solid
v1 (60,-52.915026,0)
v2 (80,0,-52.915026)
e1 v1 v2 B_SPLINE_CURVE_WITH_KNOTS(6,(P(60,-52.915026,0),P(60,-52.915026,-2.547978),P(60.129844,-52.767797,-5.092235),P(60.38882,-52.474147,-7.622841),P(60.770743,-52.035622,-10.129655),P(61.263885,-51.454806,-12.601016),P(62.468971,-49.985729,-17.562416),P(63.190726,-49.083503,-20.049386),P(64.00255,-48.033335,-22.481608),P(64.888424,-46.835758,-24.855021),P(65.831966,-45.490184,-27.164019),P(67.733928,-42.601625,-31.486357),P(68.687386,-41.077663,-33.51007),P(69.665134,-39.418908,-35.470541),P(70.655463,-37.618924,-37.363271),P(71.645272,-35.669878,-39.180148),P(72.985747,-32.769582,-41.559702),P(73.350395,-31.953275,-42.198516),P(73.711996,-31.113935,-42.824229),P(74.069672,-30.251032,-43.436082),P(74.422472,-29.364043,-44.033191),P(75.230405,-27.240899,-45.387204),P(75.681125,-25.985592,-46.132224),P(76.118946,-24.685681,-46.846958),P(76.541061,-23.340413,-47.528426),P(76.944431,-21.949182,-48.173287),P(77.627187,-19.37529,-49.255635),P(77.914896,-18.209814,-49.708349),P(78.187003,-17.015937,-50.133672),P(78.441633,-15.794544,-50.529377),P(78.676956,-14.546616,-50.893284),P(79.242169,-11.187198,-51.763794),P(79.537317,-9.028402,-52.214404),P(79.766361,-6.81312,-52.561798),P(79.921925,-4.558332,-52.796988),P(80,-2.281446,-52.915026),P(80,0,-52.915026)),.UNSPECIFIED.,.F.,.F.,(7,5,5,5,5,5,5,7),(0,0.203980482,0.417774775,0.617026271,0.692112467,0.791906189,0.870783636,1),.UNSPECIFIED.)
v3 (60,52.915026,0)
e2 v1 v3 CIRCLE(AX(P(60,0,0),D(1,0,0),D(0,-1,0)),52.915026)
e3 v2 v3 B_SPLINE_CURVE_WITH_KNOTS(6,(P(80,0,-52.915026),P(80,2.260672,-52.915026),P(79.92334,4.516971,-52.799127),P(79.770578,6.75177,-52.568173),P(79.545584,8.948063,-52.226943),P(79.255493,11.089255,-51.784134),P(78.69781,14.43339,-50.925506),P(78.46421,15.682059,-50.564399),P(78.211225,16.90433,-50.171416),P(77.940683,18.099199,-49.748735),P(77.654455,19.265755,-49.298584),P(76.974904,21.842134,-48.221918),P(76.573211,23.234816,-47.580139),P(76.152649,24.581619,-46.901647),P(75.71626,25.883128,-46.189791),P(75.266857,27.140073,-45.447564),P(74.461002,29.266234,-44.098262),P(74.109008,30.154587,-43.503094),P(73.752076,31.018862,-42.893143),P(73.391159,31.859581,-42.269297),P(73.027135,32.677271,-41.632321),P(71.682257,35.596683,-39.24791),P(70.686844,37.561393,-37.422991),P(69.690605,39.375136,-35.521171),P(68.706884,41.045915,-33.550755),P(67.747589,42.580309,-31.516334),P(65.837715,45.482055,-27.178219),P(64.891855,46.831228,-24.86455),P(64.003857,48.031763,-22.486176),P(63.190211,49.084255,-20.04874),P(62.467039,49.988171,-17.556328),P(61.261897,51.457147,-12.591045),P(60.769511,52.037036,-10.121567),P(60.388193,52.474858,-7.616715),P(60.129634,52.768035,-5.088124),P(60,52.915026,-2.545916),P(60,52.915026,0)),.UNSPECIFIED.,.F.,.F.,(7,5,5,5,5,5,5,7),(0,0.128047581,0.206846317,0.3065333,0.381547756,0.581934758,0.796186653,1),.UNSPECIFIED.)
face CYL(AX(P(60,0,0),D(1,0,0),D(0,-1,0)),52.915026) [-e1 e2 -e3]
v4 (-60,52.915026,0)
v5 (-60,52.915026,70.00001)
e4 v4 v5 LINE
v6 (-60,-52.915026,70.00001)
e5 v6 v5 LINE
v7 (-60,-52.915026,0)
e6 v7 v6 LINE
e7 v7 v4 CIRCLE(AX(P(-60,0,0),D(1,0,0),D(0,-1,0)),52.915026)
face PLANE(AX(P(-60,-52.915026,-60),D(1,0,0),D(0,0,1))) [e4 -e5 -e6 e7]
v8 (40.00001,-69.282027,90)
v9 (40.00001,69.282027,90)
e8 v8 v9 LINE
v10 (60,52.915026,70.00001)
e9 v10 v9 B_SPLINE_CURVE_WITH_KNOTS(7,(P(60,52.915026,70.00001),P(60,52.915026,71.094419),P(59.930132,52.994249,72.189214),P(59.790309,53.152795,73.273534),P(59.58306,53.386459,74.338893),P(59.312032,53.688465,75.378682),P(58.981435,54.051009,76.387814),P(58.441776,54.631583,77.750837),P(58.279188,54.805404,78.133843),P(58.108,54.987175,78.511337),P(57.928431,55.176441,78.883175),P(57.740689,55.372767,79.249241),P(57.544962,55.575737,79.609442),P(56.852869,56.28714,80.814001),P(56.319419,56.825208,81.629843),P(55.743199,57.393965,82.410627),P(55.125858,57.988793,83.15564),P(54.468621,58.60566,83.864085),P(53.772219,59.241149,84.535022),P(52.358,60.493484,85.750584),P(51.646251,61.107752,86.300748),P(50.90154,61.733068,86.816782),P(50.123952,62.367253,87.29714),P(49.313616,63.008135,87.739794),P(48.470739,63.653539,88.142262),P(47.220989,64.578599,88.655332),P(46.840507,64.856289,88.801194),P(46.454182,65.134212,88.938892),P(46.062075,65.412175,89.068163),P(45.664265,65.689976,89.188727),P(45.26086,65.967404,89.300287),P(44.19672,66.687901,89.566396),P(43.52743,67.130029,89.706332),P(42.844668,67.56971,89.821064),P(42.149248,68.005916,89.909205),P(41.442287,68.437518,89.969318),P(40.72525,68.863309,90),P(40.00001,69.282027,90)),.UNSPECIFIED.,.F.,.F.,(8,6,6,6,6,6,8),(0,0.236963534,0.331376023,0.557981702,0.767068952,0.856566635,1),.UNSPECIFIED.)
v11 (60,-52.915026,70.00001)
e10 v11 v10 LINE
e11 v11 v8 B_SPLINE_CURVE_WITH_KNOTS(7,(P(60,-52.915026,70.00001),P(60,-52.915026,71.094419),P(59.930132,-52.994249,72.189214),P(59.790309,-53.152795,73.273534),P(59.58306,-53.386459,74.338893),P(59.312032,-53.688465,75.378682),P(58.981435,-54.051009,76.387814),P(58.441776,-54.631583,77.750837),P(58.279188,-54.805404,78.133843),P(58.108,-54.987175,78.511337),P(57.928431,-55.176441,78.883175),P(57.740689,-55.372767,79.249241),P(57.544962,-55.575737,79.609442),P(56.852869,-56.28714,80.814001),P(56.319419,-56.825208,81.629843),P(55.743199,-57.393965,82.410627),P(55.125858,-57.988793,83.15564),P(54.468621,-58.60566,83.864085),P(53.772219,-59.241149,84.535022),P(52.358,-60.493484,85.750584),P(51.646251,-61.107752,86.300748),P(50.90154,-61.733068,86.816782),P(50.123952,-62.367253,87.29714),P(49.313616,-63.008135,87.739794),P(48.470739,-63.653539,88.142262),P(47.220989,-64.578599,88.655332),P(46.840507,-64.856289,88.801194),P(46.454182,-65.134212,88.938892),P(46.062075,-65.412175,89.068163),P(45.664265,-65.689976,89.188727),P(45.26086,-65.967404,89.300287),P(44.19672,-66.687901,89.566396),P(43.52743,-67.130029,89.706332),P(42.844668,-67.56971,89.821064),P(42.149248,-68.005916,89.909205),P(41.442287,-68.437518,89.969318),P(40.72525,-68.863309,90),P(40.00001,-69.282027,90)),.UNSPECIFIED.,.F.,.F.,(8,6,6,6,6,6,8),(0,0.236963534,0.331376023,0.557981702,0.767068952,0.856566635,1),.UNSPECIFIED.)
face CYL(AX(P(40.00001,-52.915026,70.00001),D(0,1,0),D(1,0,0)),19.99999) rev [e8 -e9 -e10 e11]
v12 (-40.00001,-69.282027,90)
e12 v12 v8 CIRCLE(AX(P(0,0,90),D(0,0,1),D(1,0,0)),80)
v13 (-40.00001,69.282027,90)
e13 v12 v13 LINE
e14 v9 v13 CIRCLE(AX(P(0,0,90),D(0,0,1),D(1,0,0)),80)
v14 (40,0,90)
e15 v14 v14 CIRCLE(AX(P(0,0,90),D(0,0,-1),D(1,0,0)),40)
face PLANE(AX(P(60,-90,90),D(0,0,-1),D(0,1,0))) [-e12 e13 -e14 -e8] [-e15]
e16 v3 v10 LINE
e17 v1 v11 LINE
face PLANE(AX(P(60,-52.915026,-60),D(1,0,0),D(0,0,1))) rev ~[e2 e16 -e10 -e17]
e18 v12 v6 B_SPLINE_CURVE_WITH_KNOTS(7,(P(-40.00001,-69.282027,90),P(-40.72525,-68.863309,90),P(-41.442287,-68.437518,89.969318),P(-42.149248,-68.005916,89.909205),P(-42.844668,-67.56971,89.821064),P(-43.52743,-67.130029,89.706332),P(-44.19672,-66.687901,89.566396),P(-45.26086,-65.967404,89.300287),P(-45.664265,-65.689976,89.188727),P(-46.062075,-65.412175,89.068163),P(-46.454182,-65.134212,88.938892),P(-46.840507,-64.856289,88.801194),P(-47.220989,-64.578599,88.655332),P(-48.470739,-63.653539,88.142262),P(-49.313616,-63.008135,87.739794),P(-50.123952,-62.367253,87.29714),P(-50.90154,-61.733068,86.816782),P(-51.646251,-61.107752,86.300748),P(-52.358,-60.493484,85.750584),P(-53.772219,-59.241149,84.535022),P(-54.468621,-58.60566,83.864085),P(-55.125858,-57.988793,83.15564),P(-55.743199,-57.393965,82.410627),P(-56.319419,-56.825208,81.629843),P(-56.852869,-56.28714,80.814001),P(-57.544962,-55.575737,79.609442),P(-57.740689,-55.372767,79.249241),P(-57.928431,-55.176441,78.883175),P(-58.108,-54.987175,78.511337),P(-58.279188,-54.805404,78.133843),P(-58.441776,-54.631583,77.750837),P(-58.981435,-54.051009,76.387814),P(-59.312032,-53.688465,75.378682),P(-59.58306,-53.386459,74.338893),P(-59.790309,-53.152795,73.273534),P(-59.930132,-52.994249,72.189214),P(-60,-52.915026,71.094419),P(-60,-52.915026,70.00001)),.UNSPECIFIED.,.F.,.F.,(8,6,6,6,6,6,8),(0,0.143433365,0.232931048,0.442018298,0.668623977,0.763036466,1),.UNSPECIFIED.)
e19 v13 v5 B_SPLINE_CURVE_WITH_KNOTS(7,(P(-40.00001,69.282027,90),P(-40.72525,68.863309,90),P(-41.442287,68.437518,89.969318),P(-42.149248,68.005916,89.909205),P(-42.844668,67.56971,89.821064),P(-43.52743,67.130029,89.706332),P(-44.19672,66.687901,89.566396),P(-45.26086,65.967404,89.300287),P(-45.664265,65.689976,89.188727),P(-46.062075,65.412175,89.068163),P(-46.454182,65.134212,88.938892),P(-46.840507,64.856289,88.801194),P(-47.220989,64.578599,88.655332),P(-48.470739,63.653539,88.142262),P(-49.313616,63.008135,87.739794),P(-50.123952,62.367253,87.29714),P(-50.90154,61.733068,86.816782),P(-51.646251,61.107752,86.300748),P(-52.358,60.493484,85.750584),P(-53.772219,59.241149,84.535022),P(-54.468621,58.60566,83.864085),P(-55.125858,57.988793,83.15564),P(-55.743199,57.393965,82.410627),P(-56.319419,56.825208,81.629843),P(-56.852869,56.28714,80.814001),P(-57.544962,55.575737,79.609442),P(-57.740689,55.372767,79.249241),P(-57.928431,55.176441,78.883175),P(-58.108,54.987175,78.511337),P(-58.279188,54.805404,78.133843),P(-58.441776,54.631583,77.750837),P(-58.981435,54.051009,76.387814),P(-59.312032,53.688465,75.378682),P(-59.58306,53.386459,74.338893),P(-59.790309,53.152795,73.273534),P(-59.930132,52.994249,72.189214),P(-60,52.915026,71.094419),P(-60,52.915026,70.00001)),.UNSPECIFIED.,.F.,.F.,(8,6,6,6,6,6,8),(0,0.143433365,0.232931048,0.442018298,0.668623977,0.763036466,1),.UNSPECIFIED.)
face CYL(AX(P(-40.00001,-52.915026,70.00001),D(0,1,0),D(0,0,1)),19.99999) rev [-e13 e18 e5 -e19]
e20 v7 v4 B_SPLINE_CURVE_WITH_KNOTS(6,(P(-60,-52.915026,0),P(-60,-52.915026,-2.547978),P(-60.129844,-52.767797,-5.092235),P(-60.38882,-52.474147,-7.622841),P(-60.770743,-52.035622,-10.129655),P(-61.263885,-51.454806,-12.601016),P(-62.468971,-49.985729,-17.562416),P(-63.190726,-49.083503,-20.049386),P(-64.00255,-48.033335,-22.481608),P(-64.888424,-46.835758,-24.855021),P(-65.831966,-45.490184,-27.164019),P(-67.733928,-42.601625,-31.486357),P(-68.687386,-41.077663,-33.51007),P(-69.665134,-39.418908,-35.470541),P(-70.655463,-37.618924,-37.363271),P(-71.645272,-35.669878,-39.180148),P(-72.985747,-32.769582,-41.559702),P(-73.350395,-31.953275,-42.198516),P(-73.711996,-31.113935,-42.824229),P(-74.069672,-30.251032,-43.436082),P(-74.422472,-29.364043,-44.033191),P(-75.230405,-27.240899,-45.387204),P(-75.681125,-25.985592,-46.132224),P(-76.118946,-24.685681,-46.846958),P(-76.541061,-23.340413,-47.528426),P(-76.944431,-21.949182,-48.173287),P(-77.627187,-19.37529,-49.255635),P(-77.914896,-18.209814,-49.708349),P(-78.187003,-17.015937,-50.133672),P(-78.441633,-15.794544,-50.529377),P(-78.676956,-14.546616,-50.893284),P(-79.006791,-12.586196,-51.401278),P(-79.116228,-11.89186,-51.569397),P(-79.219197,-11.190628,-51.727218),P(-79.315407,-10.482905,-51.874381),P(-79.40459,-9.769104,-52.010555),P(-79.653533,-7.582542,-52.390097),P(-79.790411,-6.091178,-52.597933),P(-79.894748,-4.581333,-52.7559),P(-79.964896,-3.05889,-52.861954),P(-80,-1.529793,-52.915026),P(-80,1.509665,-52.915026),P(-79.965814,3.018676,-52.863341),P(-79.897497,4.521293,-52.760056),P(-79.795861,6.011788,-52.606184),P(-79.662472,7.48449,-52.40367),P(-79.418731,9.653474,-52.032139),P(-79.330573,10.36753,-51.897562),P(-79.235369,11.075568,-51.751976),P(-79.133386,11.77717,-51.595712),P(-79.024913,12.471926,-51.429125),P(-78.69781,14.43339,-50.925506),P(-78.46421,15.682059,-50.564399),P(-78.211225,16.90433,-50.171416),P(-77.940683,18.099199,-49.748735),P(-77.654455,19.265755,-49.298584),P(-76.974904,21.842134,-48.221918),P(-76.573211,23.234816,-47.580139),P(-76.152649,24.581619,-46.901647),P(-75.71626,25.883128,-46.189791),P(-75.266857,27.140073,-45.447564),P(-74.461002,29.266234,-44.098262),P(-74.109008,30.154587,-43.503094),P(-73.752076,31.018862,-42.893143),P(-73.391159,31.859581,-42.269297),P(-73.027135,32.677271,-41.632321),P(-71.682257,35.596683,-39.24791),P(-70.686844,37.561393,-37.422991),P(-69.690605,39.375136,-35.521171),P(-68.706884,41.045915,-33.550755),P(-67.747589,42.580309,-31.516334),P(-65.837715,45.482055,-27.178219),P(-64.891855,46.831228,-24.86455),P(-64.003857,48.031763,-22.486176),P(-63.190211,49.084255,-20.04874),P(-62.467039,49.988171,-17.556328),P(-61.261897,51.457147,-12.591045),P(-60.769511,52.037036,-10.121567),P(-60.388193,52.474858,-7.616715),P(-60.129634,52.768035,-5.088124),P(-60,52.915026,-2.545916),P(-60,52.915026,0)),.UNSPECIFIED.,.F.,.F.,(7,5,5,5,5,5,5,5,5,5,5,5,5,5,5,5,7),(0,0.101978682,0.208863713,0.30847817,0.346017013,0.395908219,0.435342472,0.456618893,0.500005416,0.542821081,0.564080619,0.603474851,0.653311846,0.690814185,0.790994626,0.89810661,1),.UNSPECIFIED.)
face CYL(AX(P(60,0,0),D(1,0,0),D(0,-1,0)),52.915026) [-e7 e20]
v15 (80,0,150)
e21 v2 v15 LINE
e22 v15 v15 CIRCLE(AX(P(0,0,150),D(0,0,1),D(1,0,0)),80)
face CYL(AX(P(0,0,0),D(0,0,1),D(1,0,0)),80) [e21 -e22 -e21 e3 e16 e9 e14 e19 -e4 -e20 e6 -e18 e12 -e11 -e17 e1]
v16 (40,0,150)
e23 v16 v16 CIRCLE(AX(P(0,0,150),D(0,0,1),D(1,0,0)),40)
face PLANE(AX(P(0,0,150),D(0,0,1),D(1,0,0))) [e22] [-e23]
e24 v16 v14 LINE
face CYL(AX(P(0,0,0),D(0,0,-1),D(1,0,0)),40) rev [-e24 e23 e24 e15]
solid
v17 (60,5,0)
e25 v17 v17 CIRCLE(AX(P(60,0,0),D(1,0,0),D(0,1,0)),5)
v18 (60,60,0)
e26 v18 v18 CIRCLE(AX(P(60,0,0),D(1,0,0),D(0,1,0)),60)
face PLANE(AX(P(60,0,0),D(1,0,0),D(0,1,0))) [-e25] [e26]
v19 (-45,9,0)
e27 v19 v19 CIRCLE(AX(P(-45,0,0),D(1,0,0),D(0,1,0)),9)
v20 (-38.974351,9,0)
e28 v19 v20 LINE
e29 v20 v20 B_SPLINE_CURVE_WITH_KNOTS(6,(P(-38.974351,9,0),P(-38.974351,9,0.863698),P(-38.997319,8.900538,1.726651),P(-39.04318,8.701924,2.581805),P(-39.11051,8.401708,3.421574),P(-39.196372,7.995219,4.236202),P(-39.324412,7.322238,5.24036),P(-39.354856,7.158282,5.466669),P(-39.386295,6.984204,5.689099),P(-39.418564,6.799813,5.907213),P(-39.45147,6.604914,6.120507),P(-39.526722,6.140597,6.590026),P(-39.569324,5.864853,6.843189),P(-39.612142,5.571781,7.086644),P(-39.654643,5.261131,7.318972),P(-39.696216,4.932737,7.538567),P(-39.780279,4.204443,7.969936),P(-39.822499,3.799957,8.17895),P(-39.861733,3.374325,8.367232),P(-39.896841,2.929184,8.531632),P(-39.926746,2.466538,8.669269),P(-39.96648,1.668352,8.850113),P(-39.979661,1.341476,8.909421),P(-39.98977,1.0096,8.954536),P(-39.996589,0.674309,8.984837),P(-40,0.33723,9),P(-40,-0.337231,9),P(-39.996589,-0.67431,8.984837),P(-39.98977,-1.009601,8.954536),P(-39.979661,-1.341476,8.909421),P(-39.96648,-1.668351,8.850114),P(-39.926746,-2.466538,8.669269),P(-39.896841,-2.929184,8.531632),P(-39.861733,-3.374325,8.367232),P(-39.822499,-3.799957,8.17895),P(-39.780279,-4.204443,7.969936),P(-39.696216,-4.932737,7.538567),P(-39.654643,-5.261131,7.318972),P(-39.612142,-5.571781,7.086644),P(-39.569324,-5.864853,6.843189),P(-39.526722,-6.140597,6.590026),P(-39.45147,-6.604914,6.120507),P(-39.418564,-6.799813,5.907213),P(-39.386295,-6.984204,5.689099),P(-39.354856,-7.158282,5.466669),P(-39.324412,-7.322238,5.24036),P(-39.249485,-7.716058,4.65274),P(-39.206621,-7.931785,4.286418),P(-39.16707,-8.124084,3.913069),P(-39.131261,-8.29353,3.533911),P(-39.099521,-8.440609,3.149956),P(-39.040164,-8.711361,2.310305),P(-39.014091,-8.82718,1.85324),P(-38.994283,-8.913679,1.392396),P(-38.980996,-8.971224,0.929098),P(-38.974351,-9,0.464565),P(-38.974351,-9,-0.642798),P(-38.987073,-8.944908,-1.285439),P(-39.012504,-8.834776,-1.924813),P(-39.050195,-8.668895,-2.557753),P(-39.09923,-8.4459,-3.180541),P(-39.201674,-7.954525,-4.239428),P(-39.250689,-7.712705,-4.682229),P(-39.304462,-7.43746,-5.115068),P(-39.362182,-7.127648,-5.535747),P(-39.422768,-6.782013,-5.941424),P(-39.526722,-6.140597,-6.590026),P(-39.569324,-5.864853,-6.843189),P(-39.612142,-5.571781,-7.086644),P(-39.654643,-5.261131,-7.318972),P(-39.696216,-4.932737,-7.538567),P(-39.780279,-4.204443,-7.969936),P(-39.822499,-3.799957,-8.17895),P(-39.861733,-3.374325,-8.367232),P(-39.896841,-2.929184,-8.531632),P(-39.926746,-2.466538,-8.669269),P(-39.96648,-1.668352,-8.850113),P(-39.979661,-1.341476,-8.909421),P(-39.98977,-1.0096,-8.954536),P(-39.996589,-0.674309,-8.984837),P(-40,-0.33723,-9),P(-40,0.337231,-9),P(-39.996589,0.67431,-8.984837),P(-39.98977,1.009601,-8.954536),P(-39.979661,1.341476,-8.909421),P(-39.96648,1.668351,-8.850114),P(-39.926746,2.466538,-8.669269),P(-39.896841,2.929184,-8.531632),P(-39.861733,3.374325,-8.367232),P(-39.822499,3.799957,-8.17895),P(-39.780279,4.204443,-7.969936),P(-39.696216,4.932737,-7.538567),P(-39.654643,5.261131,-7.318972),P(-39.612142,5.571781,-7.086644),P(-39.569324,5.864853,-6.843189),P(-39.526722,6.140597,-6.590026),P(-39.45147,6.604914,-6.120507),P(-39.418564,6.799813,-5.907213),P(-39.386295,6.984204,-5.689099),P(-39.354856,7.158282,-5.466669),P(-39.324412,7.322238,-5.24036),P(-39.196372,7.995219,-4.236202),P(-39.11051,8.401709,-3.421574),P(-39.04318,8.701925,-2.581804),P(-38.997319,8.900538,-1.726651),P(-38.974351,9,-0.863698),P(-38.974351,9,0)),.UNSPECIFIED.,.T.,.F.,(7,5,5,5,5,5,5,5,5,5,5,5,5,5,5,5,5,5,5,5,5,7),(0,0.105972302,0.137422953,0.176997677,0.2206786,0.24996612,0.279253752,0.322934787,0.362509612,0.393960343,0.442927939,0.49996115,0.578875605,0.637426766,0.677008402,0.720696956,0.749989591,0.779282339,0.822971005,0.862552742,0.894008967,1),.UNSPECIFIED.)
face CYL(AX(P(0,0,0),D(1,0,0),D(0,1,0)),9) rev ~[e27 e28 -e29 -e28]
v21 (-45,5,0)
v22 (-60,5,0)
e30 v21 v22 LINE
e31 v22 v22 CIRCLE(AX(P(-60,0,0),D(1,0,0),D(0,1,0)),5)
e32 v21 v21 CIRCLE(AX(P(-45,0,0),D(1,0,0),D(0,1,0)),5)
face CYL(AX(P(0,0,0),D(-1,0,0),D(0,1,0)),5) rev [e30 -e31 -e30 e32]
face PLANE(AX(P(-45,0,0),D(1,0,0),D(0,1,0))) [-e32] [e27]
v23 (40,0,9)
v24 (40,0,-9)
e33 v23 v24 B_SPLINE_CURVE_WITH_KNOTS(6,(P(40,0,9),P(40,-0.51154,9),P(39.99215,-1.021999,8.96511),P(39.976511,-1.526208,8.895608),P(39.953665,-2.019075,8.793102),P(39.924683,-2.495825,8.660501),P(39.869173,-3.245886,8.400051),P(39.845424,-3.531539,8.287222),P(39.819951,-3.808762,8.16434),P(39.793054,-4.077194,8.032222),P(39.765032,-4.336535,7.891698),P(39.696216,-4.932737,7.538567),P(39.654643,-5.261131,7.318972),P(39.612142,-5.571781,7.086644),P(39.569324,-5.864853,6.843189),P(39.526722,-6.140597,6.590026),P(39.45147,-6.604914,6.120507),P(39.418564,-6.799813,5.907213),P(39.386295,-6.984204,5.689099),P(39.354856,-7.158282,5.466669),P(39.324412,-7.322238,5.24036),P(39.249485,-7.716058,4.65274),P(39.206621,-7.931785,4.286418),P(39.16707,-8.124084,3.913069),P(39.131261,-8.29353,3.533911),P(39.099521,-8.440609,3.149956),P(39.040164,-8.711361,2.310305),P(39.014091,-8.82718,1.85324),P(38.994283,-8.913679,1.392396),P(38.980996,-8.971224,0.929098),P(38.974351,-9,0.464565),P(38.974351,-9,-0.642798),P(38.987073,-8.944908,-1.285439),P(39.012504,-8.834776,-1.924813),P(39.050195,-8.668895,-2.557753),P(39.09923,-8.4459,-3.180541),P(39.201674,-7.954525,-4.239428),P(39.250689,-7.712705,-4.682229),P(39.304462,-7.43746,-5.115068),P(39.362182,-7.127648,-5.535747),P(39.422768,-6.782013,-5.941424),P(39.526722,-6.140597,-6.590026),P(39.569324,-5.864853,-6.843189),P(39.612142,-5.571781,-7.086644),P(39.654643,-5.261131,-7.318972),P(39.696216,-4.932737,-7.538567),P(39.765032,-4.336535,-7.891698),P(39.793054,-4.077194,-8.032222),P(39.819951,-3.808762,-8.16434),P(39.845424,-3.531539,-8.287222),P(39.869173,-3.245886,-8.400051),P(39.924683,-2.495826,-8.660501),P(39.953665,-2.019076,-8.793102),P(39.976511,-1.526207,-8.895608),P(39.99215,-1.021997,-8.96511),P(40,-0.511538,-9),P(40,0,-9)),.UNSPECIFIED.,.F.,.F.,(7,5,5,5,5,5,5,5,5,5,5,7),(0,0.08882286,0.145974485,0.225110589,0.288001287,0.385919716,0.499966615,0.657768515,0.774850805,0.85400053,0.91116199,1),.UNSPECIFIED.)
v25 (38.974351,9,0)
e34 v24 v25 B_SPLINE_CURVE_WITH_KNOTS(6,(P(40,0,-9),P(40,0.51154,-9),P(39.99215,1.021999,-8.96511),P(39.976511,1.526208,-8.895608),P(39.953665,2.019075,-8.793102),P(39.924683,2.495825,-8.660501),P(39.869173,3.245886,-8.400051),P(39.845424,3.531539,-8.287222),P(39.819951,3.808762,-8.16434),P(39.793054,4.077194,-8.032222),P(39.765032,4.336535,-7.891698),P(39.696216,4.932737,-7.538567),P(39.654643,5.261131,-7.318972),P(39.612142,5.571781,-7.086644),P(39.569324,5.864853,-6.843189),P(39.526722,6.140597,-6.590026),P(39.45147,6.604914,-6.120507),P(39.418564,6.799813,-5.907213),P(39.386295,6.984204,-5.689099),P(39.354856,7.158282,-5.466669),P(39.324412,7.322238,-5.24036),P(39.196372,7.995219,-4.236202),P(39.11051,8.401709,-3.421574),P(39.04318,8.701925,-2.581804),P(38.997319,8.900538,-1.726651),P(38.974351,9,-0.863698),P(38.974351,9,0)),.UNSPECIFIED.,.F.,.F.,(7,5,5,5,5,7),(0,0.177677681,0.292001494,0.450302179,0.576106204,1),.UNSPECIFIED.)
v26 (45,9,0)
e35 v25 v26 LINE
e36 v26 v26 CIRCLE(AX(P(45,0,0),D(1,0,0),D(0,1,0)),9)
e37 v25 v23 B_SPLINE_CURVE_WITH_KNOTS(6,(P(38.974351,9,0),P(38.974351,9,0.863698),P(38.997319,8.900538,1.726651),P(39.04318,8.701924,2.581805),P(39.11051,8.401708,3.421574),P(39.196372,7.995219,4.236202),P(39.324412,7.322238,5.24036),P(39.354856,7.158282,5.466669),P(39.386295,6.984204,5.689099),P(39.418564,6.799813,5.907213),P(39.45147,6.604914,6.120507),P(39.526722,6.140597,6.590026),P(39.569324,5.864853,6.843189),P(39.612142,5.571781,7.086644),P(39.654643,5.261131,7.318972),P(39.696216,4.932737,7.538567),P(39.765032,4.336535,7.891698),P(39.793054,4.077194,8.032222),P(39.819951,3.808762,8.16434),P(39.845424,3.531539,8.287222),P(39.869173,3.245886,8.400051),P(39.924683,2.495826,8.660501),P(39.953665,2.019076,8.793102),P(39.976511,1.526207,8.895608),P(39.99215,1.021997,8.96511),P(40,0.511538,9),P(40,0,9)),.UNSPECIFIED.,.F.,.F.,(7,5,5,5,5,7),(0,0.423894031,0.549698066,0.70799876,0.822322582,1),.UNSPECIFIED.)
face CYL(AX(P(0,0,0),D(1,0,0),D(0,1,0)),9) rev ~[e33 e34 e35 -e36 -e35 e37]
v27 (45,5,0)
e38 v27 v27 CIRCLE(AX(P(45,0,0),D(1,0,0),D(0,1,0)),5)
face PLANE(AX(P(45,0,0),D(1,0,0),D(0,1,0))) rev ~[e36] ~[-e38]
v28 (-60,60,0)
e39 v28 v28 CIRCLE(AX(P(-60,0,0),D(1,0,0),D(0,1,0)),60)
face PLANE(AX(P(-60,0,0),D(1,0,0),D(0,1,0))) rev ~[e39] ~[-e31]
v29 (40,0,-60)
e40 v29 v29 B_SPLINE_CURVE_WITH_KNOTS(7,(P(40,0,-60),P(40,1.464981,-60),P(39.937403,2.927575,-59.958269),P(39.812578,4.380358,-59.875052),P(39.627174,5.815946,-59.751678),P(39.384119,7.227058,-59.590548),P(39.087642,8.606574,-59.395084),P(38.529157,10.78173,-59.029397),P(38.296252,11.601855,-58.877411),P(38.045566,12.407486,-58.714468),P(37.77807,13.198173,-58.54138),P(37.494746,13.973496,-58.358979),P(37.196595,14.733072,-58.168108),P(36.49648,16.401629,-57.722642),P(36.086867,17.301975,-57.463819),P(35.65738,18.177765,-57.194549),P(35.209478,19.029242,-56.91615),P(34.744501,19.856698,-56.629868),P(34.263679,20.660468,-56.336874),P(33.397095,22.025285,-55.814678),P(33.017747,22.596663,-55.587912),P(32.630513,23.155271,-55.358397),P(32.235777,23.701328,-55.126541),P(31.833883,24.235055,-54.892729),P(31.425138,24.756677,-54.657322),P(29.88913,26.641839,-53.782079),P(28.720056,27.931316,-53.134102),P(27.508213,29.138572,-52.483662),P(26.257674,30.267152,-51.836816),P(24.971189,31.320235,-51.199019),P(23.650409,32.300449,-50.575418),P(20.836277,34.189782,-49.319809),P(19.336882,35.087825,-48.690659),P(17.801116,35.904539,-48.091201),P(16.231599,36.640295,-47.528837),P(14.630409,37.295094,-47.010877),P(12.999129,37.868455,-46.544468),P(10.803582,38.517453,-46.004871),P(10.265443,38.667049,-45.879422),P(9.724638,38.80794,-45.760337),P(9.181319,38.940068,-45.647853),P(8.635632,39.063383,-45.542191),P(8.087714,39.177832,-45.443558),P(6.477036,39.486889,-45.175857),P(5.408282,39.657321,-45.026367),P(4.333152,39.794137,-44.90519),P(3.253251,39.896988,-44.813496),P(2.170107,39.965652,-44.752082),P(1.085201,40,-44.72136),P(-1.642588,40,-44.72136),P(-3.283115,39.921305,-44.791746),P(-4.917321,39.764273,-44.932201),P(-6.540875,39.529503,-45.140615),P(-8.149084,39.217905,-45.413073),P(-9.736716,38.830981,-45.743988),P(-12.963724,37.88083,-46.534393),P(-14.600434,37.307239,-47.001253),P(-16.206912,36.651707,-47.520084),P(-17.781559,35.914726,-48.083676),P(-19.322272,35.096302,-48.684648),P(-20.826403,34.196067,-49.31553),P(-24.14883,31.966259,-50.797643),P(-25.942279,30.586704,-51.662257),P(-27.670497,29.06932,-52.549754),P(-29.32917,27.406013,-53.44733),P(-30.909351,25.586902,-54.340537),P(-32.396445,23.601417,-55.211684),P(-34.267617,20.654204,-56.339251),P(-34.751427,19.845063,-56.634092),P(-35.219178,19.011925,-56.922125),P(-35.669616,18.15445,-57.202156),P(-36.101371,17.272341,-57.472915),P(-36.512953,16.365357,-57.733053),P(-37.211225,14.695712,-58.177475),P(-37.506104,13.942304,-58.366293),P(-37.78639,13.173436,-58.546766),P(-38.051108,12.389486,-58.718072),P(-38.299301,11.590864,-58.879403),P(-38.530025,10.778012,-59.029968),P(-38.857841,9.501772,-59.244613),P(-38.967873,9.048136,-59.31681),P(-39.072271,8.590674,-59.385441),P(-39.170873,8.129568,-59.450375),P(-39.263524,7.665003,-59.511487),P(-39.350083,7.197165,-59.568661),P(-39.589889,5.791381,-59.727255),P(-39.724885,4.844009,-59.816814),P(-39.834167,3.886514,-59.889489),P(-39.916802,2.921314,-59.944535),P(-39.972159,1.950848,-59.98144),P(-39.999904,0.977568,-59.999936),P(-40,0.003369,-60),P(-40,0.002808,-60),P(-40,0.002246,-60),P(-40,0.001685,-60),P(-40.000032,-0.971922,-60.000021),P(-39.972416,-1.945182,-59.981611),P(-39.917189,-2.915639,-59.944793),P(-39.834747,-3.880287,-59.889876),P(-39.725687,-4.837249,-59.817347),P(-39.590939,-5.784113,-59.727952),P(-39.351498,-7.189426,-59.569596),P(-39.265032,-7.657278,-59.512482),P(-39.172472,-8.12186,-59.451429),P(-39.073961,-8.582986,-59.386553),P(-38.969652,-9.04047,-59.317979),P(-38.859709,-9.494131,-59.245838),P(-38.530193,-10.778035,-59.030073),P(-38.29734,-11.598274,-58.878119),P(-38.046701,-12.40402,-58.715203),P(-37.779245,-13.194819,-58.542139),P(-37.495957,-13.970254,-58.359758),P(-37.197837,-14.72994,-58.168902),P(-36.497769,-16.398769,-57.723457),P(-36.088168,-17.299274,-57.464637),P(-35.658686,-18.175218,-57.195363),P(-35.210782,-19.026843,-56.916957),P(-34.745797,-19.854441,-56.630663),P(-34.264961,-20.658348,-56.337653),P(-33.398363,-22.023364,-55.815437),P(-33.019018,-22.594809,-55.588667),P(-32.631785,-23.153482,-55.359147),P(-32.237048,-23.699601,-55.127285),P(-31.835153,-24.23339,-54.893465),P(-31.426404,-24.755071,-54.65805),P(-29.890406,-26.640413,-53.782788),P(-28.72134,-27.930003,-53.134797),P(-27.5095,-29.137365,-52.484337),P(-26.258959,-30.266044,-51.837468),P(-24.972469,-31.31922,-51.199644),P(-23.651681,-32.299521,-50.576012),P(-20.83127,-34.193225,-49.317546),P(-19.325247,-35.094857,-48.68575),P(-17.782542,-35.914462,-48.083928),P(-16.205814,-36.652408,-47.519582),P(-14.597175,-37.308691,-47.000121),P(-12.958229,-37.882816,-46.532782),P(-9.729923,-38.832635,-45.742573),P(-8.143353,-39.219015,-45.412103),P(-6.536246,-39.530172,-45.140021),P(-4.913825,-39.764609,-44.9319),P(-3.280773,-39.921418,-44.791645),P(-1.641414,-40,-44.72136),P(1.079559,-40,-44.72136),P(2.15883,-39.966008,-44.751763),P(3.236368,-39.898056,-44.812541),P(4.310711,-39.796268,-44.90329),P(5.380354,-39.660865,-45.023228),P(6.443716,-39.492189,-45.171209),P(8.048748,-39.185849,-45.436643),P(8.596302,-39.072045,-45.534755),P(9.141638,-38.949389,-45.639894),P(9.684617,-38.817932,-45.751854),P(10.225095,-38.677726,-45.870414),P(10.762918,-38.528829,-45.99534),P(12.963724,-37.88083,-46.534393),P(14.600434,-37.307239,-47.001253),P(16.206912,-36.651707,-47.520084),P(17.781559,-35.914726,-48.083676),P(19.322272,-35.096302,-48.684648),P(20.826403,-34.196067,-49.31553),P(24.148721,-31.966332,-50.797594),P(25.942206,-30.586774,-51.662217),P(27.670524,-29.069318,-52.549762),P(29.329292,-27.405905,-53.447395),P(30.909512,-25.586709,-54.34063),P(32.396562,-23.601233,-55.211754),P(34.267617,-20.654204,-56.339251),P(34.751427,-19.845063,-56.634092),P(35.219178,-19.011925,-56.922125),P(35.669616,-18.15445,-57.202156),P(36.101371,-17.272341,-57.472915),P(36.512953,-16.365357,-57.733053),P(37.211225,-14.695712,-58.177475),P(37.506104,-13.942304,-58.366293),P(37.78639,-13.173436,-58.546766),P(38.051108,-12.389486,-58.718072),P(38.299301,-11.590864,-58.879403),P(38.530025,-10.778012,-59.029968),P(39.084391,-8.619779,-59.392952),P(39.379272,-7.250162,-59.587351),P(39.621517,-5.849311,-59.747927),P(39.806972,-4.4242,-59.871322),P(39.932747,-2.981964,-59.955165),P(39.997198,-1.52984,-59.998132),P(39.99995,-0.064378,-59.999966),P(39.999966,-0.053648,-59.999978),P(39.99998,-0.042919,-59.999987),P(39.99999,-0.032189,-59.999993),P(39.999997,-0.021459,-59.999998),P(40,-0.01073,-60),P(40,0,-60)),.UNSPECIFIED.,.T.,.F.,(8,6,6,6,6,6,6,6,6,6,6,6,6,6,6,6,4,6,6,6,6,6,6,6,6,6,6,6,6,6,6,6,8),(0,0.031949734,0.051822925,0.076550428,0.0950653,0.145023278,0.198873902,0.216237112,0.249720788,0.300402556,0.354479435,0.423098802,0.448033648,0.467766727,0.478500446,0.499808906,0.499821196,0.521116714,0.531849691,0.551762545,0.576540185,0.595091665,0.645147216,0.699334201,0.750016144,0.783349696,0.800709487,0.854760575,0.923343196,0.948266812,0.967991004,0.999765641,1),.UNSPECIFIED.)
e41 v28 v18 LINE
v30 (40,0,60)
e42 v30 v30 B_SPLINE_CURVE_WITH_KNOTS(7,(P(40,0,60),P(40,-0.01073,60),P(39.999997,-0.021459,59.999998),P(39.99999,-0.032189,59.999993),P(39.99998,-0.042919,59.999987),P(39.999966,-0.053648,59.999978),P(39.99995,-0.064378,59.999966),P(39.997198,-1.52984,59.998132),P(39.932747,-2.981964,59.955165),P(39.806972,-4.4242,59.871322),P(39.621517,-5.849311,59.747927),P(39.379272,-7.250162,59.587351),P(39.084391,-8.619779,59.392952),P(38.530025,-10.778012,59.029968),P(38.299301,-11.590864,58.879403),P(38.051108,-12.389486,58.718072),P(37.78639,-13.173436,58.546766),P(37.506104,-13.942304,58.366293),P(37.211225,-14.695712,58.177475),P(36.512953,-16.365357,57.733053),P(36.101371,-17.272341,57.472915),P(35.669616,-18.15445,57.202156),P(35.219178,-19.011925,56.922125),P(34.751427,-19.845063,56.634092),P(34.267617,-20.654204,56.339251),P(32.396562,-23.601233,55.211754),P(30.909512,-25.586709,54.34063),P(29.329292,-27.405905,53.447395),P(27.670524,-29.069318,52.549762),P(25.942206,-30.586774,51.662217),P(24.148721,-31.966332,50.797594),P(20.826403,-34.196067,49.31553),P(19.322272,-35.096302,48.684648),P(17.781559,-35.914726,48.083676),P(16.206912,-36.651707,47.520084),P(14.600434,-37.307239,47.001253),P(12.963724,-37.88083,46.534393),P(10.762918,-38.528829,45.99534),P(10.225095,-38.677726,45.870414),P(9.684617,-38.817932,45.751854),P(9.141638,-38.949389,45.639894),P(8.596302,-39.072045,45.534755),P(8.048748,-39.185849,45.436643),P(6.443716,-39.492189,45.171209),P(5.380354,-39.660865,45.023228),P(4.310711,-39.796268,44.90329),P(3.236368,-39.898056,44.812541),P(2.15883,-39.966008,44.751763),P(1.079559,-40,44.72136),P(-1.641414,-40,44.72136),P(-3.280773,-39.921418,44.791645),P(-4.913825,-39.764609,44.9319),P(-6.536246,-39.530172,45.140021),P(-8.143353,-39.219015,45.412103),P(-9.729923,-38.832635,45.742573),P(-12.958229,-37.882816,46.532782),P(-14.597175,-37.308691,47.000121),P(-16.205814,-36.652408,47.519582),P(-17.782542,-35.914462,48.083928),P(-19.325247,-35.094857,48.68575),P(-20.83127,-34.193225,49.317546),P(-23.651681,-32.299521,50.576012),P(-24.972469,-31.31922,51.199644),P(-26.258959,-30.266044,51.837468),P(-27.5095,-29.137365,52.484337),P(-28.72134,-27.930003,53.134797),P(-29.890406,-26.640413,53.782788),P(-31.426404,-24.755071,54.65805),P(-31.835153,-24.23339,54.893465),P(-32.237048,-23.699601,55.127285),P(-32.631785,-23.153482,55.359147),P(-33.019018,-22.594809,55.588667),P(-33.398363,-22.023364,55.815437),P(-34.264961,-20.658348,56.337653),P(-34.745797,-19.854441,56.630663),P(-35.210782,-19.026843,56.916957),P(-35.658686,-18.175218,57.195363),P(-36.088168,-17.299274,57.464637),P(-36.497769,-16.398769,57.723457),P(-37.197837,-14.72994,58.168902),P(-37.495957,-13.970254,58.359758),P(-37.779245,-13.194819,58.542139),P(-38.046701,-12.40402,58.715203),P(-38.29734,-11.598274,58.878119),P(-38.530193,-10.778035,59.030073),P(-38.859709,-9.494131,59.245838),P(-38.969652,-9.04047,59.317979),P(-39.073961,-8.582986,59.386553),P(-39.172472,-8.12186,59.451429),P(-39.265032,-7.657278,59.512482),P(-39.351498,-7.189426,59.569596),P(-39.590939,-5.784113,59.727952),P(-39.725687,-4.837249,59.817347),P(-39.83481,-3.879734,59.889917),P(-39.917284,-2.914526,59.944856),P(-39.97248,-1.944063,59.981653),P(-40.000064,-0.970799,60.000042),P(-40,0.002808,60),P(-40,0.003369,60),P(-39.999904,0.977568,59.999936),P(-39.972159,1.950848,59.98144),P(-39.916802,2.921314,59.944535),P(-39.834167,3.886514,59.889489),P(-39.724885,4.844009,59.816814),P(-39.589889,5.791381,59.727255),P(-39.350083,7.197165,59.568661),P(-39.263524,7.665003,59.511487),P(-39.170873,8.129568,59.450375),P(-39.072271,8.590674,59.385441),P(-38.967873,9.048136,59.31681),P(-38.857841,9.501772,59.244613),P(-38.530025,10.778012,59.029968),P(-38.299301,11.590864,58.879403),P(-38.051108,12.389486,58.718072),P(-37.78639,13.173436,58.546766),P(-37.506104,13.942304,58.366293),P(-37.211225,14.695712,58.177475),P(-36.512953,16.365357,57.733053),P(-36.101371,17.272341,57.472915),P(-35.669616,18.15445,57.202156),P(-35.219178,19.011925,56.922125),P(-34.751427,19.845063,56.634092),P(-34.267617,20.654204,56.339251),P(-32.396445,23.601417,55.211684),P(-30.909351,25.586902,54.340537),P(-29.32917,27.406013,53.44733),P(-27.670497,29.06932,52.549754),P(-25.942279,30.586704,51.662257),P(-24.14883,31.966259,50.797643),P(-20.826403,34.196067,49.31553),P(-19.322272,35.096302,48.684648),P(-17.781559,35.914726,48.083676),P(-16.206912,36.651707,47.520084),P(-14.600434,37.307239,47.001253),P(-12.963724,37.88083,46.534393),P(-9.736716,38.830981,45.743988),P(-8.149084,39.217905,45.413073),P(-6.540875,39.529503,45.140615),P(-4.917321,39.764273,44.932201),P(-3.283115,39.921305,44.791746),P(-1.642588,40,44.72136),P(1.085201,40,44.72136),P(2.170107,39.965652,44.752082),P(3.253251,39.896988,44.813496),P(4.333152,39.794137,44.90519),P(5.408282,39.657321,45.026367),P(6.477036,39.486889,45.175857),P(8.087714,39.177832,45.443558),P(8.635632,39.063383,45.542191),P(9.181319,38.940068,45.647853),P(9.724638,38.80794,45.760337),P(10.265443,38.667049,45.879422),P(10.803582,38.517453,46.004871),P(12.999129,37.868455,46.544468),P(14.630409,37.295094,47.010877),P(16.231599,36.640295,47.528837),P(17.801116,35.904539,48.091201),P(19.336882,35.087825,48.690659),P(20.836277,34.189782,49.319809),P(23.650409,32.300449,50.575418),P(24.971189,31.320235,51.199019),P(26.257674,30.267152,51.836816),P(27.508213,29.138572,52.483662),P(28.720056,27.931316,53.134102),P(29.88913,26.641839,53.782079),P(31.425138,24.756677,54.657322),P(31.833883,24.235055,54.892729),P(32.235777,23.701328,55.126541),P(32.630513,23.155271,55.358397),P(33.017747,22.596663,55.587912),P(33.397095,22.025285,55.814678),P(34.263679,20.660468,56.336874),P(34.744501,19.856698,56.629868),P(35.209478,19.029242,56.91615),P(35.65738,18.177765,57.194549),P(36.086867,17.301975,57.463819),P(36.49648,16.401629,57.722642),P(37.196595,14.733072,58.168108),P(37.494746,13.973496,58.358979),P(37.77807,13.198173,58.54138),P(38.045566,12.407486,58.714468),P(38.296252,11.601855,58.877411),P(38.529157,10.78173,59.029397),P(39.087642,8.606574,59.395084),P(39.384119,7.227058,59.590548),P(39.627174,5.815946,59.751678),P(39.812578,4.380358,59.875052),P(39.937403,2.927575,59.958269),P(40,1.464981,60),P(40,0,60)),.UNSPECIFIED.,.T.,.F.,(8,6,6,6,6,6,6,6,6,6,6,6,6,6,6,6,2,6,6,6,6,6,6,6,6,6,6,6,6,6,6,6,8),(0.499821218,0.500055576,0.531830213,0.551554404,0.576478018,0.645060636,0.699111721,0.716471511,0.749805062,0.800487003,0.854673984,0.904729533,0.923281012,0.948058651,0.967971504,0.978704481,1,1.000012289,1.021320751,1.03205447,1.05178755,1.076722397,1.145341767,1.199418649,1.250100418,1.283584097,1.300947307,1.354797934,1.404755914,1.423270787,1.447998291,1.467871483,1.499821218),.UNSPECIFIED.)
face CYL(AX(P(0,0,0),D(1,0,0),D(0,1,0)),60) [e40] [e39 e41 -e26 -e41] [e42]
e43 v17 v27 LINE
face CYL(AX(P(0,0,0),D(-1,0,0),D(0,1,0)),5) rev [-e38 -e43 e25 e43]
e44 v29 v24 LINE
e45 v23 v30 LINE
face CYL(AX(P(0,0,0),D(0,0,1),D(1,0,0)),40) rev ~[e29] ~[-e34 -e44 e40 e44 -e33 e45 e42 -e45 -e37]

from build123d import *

# Parameters (mm, degrees)
F8_R           = 40
F9_DEPTH       = 60
F0_R           = 60
F0_R_2         = 9
F0_R_3         = 5
F1_DEPTH       = 60
F10_DEPTH      = 45
F8_R_2         = 80
F3_DEPTH       = 150
F3_DEPTH_BACK  = 60
F4_W           = 105.8300524426
F4_H           = 30
F11_DEPTH      = 25
F11_DEPTH_BACK = 145
F6_W           = 120
F6_H           = 150
F7_DEPTH       = 105.8300524426
F12_R          = 19.99999


# Not quite as in the source:
# - a fillet or chamfer is up to 0.001 mm smaller than in the source, because OpenCascade refuses the exact size


with BuildPart() as f9:
    # F8 (on Top) → F9 (new body, symmetric)
    with BuildSketch(Plane.XY):
        Circle(F8_R)
    extrude(amount=F9_DEPTH, both=True)


with BuildPart() as f1:
    # F0 (on Right) → F1 (new body, symmetric)
    with BuildSketch(Plane.YZ):
        Circle(F0_R)
        Circle(F0_R_2, mode=Mode.SUBTRACT)
        Circle(F0_R_2)
        Circle(F0_R_3, mode=Mode.SUBTRACT)
    extrude(amount=F1_DEPTH, both=True)

    # F2: cut F9
    add(f9.part, mode=Mode.SUBTRACT)

    # F0 (on Right) → F10 (cut, symmetric)
    with BuildSketch(Plane.YZ):
        Circle(F0_R_2)
        Circle(F0_R_3, mode=Mode.SUBTRACT)
    extrude(amount=F10_DEPTH, both=True, mode=Mode.SUBTRACT)


with BuildPart() as f3:
    # F8 (on Top) → F3 (new body, two sides)
    with BuildSketch(Plane.XY) as f3_sk:
        Circle(F8_R_2)
        Circle(F8_R, mode=Mode.SUBTRACT)
    extrude(amount=F3_DEPTH)
    extrude(f3_sk.sketch, amount=-F3_DEPTH_BACK)


with BuildPart() as f11:
    # F4 (on face) → F11 (new body, two sides)
    with BuildSketch(Plane.YZ.offset(60)) as f11_sk:
        with BuildLine():
            Line((-52.9150262213, 0), (52.9150262213, 0))
            ThreePointArc((52.9150262213, 0), (0, 52.9150262213), (-52.9150262213, 0))
        make_face()
        with BuildLine():
            ThreePointArc((-52.9150262213, 0), (0, -52.9150262213), (52.9150262213, 0))
            Line((52.9150262213, 0), (-52.9150262213, 0))
        make_face()
        with BuildLine():
            ThreePointArc((-52.9150262213, 0), (0, 52.9150262213), (52.9150262213, 0))
            Line((52.9150262213, 0), (52.9150262213, 90))
            Line((52.9150262213, 90), (-52.9150262213, 90))
            Line((-52.9150262213, 90), (-52.9150262213, 0))
        make_face()
        with Locations((0, 105)):
            Rectangle(F4_W, F4_H)
        Polygon((52.9150262213, 120), (52.9150262213, 90), (90, 90), (90, 150), (-90, 150), (-90, 90), (-52.9150262213, 90), (-52.9150262213, 120), align=None)
    extrude(amount=F11_DEPTH)
    extrude(f11_sk.sketch, amount=-F11_DEPTH_BACK)


with BuildPart() as f3_1:
    add(f3.part)

    # F5: intersect F11
    add(f11.part, mode=Mode.INTERSECT)

    # F6 (on face) → F7 (cut, through all)
    with BuildSketch(Plane.XZ.offset(52.9150262213)):
        with Locations((0, 15)):
            Rectangle(F6_W, F6_H)
    extrude(amount=-F7_DEPTH, mode=Mode.SUBTRACT)

    # F12 (radius 20 in the source; OpenCascade refuses exactly that, so slightly less here)
    f12_edges = [f3_1.edges().sort_by_distance(p)[0] for p in [
        (-60, 0, 90),
        (60, 0, 90),
    ]]
    fillet(f12_edges, radius=F12_R)


solid = Compound([f1.part, f3_1.part])
